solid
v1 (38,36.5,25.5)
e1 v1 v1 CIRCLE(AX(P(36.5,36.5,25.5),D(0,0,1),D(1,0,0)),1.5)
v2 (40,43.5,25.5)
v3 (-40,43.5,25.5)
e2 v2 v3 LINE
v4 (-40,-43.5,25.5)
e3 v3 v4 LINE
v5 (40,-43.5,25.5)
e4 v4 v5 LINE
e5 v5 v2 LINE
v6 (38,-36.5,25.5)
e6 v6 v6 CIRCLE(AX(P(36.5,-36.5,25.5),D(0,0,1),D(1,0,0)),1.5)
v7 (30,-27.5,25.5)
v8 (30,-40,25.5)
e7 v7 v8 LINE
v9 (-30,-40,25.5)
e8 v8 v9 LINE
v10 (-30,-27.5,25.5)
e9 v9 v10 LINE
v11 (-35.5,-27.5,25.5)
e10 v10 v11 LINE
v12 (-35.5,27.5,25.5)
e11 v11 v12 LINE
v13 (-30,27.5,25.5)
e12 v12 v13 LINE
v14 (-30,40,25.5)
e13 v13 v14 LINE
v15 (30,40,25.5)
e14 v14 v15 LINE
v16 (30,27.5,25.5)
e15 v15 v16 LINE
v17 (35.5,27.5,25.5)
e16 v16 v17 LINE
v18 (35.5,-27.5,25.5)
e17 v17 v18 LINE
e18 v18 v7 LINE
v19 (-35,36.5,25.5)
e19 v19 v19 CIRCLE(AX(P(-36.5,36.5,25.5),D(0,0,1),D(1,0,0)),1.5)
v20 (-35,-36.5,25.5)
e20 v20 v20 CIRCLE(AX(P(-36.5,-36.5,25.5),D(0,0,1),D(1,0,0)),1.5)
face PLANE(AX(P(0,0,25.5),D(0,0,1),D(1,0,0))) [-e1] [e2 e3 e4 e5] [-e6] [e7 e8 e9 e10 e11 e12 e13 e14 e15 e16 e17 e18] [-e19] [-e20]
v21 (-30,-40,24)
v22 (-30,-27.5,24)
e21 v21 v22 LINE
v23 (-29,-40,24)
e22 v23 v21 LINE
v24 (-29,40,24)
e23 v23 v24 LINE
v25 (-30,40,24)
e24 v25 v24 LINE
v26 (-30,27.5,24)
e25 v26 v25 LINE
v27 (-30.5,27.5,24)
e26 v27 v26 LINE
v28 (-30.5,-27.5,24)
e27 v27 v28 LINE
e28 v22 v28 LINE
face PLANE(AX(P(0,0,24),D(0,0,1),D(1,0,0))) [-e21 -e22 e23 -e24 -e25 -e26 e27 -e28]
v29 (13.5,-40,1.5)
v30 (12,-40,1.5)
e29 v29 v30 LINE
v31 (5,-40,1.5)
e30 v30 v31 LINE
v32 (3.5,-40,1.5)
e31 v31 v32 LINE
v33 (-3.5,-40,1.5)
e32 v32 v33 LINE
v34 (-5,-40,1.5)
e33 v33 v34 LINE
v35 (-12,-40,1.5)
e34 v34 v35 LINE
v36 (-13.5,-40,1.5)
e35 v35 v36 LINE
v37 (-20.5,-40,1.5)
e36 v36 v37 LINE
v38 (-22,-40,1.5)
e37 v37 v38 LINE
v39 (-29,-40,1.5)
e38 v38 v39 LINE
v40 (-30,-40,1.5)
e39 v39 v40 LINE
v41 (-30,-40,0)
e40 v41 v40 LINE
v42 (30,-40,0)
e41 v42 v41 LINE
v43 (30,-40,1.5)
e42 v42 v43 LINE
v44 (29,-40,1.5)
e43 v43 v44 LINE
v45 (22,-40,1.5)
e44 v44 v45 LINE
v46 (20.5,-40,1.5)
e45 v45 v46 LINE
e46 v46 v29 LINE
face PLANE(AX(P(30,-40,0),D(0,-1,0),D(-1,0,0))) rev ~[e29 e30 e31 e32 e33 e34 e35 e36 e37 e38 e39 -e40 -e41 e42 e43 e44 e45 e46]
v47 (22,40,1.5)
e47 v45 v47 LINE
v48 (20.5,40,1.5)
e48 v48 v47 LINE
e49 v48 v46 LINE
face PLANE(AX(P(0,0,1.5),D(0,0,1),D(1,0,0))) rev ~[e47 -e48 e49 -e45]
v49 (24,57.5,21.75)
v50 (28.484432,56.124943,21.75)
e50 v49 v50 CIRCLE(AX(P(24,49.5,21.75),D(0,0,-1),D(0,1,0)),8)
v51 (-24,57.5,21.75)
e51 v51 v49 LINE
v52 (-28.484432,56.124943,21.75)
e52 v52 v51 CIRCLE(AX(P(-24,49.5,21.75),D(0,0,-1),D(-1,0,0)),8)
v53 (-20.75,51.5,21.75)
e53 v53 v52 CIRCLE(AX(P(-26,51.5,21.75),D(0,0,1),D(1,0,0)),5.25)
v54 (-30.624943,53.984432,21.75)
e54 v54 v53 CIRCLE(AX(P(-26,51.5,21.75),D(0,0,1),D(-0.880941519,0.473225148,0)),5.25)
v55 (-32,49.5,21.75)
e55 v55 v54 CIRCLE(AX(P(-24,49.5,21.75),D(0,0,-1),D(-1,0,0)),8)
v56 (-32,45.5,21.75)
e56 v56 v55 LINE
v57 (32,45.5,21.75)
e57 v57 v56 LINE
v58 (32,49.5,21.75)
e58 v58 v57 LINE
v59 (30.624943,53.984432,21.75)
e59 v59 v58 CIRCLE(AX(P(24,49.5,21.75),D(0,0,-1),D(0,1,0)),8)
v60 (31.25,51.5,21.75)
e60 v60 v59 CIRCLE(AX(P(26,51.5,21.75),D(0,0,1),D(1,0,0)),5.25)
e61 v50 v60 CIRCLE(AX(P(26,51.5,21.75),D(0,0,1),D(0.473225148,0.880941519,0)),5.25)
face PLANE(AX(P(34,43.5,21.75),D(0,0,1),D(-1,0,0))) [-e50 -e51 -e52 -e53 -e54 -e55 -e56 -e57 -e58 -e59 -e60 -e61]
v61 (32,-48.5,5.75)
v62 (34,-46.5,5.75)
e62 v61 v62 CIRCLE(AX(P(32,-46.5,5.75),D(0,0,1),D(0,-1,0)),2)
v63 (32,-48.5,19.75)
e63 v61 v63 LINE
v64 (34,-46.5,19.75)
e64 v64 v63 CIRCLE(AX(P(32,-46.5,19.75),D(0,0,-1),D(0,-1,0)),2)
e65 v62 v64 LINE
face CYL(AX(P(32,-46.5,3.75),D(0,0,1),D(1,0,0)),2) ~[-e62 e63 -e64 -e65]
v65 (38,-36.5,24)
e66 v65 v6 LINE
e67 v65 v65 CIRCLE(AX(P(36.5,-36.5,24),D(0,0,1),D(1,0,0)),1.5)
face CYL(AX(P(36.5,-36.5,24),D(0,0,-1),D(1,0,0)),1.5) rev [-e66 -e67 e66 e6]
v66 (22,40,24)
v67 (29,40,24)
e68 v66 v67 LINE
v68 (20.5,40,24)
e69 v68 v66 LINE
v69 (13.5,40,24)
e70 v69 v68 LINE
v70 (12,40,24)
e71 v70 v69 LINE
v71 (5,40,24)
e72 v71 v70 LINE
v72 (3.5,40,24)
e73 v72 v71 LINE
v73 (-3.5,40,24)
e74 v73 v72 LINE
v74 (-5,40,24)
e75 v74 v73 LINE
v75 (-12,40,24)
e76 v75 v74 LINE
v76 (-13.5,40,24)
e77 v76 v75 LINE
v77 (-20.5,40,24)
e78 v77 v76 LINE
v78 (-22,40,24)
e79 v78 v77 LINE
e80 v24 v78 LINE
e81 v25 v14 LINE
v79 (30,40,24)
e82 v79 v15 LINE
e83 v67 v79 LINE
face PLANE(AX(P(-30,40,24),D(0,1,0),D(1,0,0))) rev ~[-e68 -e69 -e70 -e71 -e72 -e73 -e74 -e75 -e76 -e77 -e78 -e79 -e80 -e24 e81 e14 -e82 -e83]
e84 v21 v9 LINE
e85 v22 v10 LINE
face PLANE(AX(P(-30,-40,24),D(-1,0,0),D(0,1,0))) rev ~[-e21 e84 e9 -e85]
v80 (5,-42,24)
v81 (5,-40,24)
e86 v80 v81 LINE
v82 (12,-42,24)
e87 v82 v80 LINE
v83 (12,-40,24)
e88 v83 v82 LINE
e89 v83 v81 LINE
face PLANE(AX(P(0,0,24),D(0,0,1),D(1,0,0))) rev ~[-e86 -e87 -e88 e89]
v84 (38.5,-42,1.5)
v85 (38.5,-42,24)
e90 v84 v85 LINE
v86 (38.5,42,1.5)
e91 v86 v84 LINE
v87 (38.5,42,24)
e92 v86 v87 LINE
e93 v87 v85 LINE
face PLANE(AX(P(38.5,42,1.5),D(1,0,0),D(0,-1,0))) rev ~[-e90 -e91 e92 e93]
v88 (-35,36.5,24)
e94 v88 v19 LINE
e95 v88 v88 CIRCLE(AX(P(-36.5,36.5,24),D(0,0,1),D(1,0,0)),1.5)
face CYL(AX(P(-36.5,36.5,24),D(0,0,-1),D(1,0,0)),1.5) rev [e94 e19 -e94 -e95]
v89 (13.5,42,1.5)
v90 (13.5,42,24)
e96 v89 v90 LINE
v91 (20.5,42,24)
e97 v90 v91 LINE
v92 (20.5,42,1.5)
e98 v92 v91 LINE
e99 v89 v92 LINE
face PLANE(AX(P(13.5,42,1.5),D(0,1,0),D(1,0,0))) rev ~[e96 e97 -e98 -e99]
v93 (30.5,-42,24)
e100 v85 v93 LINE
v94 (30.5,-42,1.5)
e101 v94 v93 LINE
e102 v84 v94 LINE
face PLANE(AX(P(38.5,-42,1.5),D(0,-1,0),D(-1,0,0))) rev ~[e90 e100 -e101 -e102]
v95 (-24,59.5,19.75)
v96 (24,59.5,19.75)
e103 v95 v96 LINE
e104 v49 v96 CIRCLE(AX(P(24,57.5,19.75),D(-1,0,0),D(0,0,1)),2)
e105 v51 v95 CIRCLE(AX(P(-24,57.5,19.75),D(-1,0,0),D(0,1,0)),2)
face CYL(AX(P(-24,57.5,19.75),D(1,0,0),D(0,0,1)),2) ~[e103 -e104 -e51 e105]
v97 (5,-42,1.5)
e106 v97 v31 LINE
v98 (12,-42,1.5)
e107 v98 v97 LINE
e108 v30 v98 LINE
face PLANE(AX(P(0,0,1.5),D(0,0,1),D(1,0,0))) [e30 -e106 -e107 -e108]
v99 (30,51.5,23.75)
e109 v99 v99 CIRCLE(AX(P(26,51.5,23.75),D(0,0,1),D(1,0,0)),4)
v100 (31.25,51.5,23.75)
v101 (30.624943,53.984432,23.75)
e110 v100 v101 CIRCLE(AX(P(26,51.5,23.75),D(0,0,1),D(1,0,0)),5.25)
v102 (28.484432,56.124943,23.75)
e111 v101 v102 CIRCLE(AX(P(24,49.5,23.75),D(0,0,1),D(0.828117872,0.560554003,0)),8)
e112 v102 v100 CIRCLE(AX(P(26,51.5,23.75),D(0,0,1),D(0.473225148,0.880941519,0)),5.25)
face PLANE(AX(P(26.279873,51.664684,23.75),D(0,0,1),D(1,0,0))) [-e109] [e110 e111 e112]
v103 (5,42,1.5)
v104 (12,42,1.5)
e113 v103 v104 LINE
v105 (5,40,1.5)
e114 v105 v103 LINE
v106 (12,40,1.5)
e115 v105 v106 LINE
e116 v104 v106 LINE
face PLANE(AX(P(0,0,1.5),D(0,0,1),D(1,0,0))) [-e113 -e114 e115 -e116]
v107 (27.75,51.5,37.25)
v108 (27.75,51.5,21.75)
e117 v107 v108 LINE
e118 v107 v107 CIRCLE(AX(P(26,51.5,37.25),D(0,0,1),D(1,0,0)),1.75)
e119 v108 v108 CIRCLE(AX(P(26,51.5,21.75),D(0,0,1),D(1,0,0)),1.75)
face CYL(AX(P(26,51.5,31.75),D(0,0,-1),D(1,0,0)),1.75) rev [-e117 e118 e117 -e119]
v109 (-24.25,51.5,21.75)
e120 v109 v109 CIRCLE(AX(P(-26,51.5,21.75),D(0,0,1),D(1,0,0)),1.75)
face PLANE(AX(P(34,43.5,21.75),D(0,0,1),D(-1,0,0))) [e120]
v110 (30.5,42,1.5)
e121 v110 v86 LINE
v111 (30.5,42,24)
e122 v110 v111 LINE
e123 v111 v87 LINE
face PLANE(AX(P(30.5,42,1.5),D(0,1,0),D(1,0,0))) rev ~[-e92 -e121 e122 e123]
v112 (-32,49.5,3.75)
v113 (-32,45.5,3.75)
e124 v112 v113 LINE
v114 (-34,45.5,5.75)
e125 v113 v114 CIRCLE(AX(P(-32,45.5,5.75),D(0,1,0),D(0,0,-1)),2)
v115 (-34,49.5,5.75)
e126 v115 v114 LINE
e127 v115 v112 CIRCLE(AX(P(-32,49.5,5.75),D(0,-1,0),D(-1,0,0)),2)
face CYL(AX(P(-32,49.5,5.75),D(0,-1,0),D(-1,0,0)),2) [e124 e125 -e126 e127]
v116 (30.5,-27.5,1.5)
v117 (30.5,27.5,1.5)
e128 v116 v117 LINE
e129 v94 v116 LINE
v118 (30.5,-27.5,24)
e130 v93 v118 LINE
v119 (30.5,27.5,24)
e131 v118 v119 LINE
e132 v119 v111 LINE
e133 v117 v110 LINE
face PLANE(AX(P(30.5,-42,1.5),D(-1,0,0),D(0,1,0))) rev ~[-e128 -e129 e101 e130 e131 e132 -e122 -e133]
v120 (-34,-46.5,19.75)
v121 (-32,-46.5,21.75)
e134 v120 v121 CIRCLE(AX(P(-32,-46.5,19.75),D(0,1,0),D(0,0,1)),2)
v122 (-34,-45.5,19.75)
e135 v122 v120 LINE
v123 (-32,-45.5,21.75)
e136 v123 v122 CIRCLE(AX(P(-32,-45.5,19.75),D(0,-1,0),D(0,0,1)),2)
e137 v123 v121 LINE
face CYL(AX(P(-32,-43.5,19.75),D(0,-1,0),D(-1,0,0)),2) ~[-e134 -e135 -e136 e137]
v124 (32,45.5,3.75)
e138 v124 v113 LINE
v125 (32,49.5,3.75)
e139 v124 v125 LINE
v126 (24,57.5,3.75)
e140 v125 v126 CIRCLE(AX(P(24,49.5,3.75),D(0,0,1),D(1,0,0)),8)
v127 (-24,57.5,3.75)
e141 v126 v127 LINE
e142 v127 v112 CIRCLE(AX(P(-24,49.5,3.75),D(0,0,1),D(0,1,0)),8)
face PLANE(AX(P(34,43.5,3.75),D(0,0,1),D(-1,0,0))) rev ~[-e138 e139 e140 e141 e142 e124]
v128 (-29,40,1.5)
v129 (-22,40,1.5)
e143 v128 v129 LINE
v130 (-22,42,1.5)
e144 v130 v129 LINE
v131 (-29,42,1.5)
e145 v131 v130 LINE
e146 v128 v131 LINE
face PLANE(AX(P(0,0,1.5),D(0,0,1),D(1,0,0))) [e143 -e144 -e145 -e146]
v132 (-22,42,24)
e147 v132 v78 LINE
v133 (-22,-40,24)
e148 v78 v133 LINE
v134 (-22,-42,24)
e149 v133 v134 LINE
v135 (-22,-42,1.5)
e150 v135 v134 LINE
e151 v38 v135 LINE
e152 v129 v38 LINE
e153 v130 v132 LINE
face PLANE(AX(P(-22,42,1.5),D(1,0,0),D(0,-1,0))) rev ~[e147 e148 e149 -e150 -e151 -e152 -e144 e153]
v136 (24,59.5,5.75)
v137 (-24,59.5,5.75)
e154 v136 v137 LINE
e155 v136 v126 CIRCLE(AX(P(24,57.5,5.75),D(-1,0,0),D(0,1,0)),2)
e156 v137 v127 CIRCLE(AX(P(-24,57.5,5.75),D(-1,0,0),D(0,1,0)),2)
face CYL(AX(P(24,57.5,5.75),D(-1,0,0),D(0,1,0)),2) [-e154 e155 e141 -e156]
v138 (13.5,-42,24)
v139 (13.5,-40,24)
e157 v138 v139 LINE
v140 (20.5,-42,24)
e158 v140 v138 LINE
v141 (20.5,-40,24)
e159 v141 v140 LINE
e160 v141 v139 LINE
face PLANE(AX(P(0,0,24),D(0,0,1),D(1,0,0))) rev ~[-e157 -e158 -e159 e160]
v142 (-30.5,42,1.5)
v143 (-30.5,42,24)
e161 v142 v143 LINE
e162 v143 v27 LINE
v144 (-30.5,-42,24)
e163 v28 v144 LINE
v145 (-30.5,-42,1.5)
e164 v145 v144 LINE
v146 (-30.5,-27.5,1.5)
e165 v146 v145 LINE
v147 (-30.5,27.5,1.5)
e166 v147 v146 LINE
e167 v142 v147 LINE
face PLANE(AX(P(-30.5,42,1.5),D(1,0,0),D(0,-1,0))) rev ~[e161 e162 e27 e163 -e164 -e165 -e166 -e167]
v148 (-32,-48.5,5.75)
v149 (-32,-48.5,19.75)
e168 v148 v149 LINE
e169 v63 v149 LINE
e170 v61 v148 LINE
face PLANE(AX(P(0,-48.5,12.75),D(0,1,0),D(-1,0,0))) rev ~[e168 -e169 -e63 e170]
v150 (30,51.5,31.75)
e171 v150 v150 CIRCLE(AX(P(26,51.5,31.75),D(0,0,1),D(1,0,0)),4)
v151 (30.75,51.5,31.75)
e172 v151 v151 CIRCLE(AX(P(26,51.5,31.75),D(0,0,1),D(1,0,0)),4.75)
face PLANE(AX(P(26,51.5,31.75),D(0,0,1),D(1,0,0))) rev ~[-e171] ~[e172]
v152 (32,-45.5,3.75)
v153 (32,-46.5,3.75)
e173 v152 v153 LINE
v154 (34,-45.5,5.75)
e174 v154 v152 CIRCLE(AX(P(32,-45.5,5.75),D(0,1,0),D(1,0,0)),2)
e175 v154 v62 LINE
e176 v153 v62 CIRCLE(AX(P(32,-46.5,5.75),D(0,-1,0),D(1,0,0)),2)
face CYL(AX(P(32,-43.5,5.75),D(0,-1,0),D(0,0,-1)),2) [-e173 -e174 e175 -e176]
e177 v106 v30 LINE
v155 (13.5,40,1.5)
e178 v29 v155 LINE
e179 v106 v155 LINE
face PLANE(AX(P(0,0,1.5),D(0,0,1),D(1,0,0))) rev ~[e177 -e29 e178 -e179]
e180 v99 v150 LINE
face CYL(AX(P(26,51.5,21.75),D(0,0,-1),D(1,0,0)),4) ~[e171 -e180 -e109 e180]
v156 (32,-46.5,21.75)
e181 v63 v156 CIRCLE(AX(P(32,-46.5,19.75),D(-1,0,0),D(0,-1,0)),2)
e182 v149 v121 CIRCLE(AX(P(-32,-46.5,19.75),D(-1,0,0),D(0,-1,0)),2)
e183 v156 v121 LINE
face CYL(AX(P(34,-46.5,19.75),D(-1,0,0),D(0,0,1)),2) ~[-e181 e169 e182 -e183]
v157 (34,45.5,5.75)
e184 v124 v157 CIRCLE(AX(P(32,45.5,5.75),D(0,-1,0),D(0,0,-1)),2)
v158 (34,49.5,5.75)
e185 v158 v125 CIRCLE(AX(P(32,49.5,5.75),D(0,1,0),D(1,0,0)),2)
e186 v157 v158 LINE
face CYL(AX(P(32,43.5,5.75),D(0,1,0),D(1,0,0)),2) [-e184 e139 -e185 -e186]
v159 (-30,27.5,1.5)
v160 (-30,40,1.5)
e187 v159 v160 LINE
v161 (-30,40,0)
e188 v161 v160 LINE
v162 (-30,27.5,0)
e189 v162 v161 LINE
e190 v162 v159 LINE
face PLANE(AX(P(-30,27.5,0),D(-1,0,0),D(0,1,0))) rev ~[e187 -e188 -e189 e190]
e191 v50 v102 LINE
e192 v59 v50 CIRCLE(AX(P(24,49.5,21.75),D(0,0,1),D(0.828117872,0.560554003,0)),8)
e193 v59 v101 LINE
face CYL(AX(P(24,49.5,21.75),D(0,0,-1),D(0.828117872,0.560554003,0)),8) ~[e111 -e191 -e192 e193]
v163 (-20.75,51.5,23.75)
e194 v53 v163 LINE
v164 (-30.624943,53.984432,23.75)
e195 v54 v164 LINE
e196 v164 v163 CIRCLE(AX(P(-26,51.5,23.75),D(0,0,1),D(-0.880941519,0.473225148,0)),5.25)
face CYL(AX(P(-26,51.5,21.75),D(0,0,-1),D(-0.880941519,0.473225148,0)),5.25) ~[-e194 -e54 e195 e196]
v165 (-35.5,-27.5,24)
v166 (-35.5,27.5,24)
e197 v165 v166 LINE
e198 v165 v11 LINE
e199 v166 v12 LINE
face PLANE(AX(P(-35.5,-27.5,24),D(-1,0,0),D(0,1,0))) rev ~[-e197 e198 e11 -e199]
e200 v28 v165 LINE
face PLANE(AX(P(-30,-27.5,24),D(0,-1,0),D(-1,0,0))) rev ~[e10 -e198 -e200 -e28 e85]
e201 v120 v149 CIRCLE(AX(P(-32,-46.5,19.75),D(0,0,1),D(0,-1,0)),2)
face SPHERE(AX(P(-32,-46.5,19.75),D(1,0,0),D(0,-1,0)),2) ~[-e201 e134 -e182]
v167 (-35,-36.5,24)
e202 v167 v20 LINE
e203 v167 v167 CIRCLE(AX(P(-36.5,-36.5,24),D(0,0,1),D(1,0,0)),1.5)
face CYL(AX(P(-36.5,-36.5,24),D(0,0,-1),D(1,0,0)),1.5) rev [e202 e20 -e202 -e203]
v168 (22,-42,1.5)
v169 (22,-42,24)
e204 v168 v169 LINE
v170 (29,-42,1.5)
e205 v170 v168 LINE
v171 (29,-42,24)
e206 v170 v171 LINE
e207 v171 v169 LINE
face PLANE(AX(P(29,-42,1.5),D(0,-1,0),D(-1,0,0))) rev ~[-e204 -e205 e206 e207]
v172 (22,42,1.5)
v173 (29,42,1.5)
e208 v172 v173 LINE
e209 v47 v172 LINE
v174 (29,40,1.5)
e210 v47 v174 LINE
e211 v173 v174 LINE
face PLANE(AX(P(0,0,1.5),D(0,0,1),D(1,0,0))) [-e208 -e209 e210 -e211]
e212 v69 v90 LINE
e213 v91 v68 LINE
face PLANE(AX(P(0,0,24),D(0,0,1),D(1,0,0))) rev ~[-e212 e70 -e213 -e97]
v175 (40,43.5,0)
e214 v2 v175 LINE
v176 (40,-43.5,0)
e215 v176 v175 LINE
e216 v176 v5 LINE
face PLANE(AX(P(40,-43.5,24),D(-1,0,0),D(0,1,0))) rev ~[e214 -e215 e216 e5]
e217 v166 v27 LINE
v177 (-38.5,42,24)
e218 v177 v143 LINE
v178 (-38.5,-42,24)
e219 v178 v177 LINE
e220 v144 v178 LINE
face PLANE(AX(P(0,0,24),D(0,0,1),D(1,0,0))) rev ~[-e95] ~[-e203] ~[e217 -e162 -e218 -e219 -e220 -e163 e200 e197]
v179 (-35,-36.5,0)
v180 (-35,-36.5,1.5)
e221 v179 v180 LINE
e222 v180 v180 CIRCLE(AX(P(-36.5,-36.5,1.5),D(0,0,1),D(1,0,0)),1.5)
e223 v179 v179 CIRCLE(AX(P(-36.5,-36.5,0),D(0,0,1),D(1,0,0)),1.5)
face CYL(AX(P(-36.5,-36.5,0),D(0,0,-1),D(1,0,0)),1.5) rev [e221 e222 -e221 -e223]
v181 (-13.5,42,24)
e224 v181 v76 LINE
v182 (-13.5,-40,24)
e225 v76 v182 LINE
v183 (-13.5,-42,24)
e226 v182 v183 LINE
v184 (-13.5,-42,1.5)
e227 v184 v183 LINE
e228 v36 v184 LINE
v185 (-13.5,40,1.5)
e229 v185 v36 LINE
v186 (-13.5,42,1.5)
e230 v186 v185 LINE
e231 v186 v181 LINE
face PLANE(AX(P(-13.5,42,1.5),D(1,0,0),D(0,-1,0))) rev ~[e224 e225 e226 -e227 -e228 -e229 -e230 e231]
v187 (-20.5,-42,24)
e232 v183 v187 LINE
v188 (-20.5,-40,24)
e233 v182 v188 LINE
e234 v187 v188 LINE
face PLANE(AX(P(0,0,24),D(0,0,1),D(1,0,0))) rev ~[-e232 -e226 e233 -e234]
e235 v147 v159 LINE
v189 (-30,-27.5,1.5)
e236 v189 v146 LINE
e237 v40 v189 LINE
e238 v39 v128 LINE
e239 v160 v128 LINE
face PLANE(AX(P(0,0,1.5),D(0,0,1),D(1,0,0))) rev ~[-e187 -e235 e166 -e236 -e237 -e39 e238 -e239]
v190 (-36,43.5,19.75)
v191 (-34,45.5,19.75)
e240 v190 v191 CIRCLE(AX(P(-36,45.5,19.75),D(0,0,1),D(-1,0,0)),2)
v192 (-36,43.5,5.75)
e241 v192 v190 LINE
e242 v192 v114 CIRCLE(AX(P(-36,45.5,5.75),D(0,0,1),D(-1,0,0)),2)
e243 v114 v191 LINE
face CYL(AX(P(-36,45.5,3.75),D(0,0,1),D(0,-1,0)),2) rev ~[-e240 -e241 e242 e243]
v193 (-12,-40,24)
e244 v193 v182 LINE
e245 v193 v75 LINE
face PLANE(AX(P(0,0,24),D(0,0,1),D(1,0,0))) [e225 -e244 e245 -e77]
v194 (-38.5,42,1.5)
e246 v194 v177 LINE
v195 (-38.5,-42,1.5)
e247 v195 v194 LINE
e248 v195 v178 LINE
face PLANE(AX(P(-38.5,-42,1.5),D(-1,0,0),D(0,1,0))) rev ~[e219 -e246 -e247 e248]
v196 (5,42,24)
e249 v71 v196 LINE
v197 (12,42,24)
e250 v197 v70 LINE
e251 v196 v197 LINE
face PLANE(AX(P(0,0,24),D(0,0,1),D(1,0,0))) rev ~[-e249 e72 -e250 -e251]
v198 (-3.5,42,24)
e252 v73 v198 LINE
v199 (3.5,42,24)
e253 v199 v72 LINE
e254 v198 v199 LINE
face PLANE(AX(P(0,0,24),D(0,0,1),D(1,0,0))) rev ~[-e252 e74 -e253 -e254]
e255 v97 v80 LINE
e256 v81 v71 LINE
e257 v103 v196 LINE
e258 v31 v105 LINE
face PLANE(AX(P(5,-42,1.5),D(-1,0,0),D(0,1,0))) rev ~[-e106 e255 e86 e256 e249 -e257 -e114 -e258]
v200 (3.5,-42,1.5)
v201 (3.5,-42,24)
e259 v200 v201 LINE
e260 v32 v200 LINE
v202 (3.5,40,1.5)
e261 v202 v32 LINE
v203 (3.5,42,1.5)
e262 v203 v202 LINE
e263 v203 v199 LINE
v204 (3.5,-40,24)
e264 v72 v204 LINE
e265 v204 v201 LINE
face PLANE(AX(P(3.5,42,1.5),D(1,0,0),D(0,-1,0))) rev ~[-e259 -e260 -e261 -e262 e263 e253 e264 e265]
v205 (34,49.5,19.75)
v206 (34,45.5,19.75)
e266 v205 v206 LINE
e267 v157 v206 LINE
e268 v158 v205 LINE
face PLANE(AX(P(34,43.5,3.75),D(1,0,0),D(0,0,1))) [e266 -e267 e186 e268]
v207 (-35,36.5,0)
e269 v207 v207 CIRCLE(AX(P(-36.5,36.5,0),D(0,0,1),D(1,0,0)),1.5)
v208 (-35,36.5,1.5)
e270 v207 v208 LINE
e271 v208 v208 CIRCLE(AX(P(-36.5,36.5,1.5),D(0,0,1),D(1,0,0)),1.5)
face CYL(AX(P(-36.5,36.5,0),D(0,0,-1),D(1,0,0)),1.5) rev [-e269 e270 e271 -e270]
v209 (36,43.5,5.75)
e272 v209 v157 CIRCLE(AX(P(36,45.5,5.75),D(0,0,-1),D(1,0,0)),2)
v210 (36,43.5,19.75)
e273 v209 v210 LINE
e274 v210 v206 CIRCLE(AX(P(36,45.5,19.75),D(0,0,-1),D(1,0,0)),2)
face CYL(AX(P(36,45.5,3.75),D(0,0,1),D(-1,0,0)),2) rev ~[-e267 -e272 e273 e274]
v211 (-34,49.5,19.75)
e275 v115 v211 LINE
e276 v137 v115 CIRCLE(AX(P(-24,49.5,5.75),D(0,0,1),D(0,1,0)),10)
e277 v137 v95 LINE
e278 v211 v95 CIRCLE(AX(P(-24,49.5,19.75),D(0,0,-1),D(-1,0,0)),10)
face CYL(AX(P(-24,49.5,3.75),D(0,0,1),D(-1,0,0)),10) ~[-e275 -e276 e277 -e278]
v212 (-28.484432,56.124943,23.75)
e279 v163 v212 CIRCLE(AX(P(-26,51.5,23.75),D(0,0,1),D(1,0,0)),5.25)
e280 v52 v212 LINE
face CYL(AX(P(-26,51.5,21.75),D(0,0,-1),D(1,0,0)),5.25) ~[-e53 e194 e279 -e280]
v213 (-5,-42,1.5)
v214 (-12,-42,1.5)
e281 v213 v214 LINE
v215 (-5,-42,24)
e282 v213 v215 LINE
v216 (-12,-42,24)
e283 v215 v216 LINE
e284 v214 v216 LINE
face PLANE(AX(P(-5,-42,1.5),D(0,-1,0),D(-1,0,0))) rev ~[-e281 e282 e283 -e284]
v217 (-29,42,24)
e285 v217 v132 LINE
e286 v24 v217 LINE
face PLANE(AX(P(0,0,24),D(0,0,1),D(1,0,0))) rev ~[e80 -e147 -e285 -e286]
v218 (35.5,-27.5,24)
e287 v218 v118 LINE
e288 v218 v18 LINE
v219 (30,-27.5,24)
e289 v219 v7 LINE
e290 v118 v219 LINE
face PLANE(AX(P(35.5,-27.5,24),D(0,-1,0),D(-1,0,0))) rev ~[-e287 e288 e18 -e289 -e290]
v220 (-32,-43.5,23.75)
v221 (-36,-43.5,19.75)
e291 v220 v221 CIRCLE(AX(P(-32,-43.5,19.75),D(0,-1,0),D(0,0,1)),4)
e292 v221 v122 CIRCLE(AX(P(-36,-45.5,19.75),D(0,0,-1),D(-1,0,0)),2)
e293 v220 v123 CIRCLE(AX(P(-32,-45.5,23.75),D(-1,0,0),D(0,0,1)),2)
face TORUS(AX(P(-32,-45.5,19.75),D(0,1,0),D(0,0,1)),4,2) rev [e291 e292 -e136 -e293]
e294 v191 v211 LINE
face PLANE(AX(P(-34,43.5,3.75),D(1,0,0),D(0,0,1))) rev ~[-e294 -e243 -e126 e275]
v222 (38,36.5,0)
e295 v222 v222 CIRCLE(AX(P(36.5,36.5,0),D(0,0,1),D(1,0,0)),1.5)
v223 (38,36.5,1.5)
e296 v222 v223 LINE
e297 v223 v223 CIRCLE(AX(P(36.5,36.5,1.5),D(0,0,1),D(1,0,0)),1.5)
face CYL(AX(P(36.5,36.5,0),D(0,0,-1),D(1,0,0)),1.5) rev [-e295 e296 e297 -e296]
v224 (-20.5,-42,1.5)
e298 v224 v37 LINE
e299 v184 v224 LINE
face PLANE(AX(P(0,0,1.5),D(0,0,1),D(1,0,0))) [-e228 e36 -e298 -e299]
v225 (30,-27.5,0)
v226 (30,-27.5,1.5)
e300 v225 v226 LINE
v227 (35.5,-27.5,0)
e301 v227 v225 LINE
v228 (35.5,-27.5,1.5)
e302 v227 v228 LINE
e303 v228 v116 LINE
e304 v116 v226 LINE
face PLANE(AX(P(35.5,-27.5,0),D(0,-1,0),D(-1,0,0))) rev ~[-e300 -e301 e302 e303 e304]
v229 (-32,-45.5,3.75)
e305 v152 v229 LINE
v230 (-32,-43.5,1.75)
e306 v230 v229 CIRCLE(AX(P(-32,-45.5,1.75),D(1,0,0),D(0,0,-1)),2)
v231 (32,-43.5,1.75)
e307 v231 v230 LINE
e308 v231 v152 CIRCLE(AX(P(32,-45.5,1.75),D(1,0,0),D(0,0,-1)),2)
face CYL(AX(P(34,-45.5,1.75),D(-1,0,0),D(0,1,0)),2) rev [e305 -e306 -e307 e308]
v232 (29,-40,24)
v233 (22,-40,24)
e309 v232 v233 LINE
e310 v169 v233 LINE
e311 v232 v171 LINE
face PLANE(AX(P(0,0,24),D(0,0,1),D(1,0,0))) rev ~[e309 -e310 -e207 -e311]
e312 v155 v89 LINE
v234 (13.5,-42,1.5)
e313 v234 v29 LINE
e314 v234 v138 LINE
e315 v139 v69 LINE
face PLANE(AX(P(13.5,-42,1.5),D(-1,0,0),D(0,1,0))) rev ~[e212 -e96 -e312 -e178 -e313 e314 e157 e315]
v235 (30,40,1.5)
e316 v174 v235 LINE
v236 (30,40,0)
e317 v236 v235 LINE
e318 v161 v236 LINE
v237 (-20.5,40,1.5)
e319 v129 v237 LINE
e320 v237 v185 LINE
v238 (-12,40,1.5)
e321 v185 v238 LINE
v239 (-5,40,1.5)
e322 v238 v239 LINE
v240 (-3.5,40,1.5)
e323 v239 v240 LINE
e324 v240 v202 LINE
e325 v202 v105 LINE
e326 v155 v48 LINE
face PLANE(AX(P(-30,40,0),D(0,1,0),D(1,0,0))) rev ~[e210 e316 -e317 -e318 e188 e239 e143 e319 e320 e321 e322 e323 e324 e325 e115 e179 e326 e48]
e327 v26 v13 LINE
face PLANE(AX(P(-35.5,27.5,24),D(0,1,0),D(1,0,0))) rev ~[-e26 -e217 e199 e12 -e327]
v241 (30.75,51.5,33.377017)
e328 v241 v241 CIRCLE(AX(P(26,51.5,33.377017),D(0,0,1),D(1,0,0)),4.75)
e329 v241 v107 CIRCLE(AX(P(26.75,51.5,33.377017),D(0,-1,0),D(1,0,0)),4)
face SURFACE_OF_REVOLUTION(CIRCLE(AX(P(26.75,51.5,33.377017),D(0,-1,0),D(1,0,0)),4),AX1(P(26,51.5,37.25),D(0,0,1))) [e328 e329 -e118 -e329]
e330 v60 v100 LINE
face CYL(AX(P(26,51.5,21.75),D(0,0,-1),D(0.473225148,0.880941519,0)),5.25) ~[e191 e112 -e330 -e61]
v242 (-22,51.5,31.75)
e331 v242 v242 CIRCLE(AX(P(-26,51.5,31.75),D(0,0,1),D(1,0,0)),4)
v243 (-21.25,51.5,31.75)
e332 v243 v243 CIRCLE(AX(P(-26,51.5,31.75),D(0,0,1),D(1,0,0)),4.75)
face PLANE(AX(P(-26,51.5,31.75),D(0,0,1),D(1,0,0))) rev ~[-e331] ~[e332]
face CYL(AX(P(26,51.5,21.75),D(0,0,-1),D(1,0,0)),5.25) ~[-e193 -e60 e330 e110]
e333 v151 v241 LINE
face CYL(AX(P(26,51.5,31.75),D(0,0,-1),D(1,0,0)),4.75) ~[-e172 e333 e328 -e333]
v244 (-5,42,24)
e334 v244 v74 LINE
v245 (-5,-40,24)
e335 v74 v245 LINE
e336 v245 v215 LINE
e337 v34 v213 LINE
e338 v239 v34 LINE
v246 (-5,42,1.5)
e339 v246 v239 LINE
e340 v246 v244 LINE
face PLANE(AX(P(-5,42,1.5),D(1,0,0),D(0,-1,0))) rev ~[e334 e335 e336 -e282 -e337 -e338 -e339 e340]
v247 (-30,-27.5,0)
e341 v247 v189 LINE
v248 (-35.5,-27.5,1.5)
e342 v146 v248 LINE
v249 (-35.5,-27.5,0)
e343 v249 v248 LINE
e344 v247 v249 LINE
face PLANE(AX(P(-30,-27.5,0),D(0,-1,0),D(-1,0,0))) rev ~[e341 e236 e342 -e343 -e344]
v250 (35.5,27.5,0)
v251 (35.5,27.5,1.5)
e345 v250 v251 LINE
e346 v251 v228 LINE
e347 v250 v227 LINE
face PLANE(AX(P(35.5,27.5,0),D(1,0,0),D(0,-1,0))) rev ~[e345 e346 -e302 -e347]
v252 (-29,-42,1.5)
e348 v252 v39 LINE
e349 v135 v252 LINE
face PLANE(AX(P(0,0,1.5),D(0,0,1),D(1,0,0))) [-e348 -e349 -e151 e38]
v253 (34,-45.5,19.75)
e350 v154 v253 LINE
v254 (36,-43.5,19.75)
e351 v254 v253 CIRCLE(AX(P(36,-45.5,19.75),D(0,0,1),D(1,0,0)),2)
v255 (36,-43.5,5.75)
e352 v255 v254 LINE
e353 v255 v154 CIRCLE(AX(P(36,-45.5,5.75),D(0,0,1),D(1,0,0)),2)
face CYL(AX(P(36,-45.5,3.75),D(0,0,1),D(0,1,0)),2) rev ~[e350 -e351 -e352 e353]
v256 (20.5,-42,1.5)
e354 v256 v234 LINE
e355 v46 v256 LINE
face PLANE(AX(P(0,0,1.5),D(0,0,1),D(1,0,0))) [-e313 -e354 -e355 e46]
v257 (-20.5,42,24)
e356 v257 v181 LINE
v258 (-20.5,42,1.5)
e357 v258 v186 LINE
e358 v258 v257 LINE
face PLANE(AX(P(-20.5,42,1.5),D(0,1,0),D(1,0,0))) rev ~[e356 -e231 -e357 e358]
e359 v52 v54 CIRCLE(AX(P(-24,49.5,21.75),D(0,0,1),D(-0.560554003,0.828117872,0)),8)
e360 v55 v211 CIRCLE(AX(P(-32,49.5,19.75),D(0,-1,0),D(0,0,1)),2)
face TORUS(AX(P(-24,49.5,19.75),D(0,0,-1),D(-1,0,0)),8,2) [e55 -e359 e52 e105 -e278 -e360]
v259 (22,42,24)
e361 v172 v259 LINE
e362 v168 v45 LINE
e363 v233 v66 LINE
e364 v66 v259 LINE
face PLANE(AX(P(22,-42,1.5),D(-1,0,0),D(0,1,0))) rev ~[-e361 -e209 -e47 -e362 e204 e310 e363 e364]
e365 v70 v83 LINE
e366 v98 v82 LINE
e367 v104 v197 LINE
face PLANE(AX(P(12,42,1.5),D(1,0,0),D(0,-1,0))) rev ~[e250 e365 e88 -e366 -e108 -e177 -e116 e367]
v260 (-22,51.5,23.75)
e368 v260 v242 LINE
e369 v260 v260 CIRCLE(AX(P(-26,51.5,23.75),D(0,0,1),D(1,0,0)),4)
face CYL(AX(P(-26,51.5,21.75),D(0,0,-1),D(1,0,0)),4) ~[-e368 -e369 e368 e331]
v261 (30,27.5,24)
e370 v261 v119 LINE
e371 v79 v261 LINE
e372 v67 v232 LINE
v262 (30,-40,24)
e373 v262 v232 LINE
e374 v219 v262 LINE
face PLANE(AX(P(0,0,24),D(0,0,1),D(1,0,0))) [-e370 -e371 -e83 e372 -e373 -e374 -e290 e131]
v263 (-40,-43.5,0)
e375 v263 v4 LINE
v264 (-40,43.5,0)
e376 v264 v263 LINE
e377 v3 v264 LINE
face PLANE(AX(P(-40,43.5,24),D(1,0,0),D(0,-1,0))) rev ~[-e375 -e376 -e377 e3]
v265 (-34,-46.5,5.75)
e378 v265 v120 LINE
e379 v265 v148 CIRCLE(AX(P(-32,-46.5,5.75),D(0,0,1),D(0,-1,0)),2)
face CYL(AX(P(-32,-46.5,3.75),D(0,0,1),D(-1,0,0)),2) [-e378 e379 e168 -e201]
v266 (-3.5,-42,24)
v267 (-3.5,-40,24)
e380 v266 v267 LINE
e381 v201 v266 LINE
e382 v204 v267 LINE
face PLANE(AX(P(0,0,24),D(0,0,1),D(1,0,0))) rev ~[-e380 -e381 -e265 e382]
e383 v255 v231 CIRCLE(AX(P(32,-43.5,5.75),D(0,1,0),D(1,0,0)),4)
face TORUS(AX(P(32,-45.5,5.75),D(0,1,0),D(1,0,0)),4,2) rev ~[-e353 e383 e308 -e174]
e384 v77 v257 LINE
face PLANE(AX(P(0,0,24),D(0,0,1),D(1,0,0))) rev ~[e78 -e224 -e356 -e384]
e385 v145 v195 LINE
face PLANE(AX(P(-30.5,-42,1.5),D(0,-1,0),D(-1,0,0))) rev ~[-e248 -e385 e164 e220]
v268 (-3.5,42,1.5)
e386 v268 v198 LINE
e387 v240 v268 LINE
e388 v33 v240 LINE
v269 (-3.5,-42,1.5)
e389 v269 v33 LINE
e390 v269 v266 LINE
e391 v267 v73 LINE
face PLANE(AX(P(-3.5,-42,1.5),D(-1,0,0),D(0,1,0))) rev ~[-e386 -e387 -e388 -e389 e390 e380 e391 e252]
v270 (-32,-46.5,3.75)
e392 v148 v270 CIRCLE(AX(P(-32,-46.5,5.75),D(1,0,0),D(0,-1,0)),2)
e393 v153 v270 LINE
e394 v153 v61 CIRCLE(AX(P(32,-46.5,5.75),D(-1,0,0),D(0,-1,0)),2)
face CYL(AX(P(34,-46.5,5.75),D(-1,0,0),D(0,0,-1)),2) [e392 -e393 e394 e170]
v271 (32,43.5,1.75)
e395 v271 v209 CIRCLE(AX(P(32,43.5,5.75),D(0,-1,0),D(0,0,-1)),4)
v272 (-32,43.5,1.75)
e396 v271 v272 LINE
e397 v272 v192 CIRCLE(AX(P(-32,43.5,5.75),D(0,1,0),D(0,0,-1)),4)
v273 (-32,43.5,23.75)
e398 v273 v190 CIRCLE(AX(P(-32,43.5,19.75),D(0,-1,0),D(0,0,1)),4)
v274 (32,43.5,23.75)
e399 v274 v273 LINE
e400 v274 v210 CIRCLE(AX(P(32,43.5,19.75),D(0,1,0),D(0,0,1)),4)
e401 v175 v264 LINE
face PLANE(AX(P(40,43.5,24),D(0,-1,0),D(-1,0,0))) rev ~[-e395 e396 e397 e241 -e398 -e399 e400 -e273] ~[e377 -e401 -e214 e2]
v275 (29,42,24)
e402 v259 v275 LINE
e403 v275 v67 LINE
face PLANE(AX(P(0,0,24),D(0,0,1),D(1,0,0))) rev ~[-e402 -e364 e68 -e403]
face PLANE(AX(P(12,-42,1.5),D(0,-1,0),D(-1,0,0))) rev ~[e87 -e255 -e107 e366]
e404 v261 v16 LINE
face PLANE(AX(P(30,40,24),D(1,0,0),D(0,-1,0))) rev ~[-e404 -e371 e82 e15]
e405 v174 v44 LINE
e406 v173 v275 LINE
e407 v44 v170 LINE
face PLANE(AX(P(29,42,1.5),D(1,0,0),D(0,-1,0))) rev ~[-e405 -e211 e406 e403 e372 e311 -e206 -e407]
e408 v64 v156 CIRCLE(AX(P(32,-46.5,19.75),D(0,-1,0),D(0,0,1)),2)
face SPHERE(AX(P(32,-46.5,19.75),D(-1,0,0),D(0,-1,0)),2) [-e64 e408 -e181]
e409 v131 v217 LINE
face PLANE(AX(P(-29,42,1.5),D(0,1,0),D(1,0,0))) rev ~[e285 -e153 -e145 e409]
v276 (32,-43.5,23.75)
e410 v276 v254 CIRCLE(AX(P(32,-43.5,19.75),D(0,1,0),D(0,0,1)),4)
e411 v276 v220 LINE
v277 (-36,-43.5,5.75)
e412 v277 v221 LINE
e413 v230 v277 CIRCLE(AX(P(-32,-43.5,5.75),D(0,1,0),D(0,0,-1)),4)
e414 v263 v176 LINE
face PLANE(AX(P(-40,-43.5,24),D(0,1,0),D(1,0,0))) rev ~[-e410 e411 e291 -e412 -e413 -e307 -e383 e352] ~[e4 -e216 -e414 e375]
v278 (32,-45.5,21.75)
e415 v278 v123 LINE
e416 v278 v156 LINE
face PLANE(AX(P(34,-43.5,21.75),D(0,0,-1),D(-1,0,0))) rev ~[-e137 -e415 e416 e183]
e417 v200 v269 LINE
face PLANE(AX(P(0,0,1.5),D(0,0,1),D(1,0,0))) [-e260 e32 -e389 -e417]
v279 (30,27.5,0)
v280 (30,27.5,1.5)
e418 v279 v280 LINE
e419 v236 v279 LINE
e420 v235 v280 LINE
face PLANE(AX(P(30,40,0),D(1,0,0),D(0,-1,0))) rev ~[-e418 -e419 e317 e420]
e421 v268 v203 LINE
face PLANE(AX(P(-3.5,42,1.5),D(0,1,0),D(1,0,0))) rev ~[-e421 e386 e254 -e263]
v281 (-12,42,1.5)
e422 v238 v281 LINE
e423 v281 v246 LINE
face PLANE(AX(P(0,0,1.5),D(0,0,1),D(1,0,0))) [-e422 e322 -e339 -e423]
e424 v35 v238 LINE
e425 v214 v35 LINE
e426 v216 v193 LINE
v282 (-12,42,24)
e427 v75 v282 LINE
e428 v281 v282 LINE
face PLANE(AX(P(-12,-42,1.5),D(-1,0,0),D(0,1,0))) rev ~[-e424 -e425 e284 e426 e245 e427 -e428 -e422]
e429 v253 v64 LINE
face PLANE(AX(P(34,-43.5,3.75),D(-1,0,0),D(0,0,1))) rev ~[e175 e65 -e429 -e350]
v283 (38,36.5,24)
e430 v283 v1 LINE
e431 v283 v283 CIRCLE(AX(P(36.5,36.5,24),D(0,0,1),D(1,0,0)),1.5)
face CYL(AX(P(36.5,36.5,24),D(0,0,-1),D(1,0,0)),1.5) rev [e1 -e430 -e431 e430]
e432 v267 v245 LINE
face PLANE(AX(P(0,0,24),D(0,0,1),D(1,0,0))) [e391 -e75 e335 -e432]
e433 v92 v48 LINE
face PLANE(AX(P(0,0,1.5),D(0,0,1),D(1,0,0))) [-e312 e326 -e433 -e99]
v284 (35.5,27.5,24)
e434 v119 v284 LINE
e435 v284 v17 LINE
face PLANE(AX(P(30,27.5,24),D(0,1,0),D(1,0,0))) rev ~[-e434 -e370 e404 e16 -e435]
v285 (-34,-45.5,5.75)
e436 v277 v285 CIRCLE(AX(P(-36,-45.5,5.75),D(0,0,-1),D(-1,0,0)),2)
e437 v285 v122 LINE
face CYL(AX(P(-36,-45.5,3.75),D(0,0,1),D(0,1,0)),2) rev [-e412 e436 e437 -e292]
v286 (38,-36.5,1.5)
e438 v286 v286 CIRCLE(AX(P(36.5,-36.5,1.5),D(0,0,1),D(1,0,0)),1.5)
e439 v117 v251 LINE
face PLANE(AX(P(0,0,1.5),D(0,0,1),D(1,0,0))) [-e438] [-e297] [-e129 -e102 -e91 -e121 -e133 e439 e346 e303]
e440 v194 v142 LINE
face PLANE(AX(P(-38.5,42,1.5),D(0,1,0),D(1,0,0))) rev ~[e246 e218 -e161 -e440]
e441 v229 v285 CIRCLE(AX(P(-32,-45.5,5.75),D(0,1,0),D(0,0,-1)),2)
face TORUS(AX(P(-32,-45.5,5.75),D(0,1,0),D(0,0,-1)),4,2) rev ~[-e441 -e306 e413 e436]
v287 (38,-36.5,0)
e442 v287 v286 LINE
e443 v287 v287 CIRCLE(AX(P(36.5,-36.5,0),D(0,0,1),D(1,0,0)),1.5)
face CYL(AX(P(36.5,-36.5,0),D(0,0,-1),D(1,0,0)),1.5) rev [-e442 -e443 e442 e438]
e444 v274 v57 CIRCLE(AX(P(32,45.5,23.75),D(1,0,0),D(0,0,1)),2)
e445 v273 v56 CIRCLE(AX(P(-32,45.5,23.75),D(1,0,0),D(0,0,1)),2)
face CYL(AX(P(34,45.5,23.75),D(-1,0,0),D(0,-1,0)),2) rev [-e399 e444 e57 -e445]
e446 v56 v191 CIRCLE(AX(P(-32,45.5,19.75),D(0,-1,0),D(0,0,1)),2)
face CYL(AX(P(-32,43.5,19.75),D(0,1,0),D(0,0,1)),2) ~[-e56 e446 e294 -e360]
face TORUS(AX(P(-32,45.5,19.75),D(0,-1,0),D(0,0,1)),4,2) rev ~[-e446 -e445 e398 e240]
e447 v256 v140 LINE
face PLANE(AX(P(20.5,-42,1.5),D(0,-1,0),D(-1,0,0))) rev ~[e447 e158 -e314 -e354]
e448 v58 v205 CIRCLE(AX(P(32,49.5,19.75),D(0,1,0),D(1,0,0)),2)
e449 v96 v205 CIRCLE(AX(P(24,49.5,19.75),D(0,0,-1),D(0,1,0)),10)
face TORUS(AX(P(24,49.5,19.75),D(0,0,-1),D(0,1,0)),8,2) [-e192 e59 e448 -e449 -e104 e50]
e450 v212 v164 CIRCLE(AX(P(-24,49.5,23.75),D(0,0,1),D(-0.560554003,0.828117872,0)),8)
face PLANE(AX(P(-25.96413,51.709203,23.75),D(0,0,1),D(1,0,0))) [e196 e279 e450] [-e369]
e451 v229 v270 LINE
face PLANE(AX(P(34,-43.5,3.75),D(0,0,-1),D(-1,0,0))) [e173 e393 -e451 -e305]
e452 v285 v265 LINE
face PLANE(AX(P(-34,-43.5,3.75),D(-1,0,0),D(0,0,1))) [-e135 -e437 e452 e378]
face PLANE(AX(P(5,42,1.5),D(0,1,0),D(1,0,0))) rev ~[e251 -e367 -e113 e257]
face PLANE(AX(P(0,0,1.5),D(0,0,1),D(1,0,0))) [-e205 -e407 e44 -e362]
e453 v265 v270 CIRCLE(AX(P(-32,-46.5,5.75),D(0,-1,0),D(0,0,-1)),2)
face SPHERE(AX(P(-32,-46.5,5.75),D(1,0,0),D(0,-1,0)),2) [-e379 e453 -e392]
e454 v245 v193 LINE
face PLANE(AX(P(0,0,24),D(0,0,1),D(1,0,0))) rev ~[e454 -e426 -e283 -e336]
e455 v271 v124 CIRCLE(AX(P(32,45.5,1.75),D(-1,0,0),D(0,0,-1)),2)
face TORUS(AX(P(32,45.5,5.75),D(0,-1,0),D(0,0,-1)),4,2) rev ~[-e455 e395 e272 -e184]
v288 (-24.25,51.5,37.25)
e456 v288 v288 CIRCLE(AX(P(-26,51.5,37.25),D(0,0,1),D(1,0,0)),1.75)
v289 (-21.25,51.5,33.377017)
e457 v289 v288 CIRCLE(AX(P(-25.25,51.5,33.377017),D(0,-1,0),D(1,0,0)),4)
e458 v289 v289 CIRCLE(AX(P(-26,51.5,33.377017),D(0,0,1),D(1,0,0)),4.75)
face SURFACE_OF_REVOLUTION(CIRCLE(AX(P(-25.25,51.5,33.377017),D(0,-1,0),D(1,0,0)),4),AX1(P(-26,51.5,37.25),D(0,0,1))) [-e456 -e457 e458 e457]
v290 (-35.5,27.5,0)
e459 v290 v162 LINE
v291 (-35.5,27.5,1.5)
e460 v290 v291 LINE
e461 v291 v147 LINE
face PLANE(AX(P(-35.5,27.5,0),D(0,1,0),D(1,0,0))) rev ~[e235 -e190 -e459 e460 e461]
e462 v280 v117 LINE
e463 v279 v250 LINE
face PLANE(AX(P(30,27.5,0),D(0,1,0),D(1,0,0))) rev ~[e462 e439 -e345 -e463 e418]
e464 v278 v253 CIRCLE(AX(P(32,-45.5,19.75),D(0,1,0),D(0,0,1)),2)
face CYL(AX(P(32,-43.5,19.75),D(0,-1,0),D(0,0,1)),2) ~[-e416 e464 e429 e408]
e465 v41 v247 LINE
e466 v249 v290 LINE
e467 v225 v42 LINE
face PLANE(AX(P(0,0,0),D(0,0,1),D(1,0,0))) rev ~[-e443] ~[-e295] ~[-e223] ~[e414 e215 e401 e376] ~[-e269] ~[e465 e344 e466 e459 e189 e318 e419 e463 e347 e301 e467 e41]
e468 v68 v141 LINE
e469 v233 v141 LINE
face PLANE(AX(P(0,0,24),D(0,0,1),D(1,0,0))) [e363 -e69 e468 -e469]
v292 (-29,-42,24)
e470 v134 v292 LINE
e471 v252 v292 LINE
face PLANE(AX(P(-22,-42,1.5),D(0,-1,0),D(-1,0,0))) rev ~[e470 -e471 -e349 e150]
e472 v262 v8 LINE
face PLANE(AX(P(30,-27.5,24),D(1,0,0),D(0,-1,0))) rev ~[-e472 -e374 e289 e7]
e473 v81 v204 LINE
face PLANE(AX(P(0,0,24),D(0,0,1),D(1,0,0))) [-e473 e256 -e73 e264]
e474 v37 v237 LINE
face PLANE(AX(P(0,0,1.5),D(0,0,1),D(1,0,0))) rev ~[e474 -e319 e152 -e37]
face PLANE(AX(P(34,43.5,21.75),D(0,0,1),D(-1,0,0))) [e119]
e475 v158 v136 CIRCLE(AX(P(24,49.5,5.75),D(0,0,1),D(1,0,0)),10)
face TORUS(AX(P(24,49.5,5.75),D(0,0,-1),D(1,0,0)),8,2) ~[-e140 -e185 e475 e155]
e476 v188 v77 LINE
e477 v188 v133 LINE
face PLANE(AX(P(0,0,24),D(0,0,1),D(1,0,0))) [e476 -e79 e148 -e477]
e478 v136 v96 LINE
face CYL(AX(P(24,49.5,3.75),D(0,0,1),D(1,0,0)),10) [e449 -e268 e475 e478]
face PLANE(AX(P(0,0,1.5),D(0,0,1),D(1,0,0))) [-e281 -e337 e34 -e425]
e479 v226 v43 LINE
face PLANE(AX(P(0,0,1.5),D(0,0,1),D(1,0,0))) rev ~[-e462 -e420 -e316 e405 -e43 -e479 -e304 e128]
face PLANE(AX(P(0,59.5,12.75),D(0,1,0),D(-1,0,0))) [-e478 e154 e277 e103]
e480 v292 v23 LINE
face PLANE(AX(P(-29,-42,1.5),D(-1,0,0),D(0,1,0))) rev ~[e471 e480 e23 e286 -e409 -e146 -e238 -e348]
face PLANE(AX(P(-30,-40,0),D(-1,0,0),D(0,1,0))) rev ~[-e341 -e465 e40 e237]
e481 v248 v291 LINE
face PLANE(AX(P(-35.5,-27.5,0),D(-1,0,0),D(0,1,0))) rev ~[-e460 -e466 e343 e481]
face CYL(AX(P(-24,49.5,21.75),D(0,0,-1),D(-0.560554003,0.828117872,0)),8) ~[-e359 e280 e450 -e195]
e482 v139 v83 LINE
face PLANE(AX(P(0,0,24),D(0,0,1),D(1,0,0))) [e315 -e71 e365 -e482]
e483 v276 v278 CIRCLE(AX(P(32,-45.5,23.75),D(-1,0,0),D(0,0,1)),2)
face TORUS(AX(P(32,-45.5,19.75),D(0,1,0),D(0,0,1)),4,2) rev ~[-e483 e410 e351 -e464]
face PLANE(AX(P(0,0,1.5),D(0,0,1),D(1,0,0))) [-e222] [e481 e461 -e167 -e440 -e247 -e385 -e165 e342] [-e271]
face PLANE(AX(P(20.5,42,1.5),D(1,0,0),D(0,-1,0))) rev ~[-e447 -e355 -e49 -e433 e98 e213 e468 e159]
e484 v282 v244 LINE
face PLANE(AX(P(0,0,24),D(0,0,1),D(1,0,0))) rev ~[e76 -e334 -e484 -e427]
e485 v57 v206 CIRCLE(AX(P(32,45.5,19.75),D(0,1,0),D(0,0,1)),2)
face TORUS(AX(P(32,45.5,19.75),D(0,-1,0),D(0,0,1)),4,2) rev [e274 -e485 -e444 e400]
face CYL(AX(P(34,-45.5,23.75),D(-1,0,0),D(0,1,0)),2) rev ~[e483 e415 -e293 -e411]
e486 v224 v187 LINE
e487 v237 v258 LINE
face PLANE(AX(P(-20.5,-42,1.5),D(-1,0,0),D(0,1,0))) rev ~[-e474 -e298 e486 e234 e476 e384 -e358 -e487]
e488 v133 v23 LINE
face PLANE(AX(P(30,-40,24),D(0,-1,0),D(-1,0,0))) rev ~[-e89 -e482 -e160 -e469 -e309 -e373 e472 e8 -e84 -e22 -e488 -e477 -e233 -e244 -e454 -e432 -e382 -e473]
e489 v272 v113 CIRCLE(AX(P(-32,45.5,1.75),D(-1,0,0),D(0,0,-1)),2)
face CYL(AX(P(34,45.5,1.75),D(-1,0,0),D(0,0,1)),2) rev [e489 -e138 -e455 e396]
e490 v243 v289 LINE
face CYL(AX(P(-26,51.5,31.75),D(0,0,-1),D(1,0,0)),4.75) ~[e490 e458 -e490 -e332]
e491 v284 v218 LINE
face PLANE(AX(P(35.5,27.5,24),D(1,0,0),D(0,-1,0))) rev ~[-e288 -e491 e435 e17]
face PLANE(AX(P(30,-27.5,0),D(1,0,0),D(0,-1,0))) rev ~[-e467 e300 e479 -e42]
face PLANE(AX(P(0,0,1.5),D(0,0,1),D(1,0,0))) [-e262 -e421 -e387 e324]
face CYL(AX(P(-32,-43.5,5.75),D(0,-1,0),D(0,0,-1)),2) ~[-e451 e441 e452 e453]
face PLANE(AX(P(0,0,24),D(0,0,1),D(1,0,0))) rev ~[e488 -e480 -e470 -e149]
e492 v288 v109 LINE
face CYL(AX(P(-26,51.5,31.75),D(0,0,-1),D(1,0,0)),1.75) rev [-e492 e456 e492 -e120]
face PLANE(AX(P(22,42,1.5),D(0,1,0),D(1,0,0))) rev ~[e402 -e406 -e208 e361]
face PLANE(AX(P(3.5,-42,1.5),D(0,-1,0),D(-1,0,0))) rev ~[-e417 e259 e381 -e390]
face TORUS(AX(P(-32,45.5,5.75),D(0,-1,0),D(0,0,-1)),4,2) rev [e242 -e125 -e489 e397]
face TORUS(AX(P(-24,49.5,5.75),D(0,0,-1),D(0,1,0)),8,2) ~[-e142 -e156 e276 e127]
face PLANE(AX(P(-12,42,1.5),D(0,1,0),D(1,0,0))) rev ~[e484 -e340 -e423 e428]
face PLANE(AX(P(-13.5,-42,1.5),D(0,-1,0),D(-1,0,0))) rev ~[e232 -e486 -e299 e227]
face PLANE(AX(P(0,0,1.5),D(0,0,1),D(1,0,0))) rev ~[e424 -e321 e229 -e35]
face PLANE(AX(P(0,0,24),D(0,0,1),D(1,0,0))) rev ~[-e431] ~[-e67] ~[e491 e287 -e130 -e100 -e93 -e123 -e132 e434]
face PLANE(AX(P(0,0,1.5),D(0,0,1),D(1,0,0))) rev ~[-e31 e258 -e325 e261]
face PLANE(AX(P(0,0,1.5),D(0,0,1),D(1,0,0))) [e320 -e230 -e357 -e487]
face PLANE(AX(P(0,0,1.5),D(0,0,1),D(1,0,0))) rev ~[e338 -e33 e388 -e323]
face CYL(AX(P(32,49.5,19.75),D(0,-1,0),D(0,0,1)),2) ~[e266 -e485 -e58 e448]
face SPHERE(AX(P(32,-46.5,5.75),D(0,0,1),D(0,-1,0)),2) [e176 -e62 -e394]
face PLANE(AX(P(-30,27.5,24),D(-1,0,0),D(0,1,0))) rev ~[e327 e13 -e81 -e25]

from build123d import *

# Parameters (mm, degrees)
F0_R      = 1.5
F1_DEPTH  = 1.5
F2_W      = 80
F2_H      = 87
F2_W_2    = 1.5
F2_H_2    = 80
F2_H_3    = 2
F3_DEPTH  = 22.5
F4_START  = 24
F4_DEPTH  = 1.5
F6_START  = -87
F5_W      = 68
F5_H      = 18
F6_DEPTH  = 5
F7_DEPTH  = 16
F8_R      = 10
F9_R      = 2
F10_R     = 4.75
F10_R_2   = 4
F11_DEPTH = 2
F10_R_3   = 1.75
F12_DEPTH = 10
F13_START = 10
F13_DEPTH = 5.5


# Not quite as in the source:
# - a fillet or chamfer that OpenCascade refuses, or shapes differently, is made with other operations: its cross-section is extruded or revolved along the edge and cut away or added


with BuildPart() as f1:
    # F0 (on Top) → F1 (new body)
    with BuildSketch(Plane.XY):
        Polygon((30, 43.5), (-40, 43.5), (-40, -43.5), (40, -43.5), (40, 27.5), (40, 43.5), align=None)
        with Locations((-36.5, -36.5)):
            Circle(F0_R, mode=Mode.SUBTRACT)
        with Locations((36.5, -36.5)):
            Circle(F0_R, mode=Mode.SUBTRACT)
        with Locations((-36.5, 36.5)):
            Circle(F0_R, mode=Mode.SUBTRACT)
        Polygon((30, 27.5), (35.5, 27.5), (35.5, -27.5), (30, -27.5), (30, -40), (-30, -40), (-30, -27.5), (-35.5, -27.5), (-35.5, 27.5), (-30, 27.5), (-30, 40), (30, 40), align=None, mode=Mode.SUBTRACT)
        with Locations((36.5, 36.5)):
            Circle(F0_R, mode=Mode.SUBTRACT)
    extrude(amount=F1_DEPTH)

    # F2 (on face) → F3 (join)
    with BuildSketch(Plane.XY.offset(1.5)):
        Rectangle(F2_W, F2_H)
        Polygon((-38.5, -42), (-38.5, 42), (-30.5, 42), (-29, 42), (-22, 42), (-20.5, 42), (-13.5, 42), (-12, 42), (-5, 42), (-3.5, 42), (3.5, 42), (5, 42), (12, 42), (13.5, 42), (20.5, 42), (22, 42), (29, 42), (30.5, 42), (38.5, 42), (38.5, -42), (30.5, -42), (29, -42), (22, -42), (20.5, -42), (13.5, -42), (12, -42), (5, -42), (3.5, -42), (-3.5, -42), (-5, -42), (-12, -42), (-13.5, -42), (-20.5, -42), (-22, -42), (-29, -42), (-30.5, -42), align=None, mode=Mode.SUBTRACT)
        Polygon((-30, 27.5), (-30.5, 27.5), (-30.5, -27.5), (-30, -27.5), (-30, -40), (-29, -40), (-29, 40), (-30, 40), align=None)
        Polygon((-29, 42), (-30.5, 42), (-30.5, 27.5), (-30, 27.5), (-30, 40), (-29, 40), align=None)
        with Locations((-21.25, 0)):
            Rectangle(F2_W_2, F2_H_2)
        with Locations((-12.75, 0)):
            Rectangle(F2_W_2, F2_H_2)
        with Locations((-4.25, 0)):
            Rectangle(F2_W_2, F2_H_2)
        with Locations((4.25, 0)):
            Rectangle(F2_W_2, F2_H_2)
        with Locations((12.75, 0)):
            Rectangle(F2_W_2, F2_H_2)
        with Locations((21.25, 0)):
            Rectangle(F2_W_2, F2_H_2)
        Polygon((30, 40), (29, 40), (29, -40), (30, -40), (30, -27.5), (30.5, -27.5), (30.5, 27.5), (30, 27.5), align=None)
        Polygon((29, -40), (29, -42), (30.5, -42), (30.5, -27.5), (30, -27.5), (30, -40), align=None)
        Polygon((30.5, 42), (29, 42), (29, 40), (30, 40), (30, 27.5), (30.5, 27.5), align=None)
        Polygon((-30.5, -27.5), (-30.5, -42), (-29, -42), (-29, -40), (-30, -40), (-30, -27.5), align=None)
        with Locations((21.25, -41)):
            Rectangle(F2_W_2, F2_H_3)
        with Locations((12.75, -41)):
            Rectangle(F2_W_2, F2_H_3)
        with Locations((-4.25, -41)):
            Rectangle(F2_W_2, F2_H_3)
        with Locations((4.25, -41)):
            Rectangle(F2_W_2, F2_H_3)
        with Locations((-12.75, -41)):
            Rectangle(F2_W_2, F2_H_3)
        with Locations((-21.25, -41)):
            Rectangle(F2_W_2, F2_H_3)
        with Locations((21.25, 41)):
            Rectangle(F2_W_2, F2_H_3)
        with Locations((12.75, 41)):
            Rectangle(F2_W_2, F2_H_3)
        with Locations((4.25, 41)):
            Rectangle(F2_W_2, F2_H_3)
        with Locations((-4.25, 41)):
            Rectangle(F2_W_2, F2_H_3)
        with Locations((-12.75, 41)):
            Rectangle(F2_W_2, F2_H_3)
        with Locations((-21.25, 41)):
            Rectangle(F2_W_2, F2_H_3)
    extrude(amount=F3_DEPTH)

    # F0 (on Top) → F4 (join)
    with BuildSketch(Plane.XY.offset(F4_START)):
        Polygon((30, 43.5), (-40, 43.5), (-40, -43.5), (40, -43.5), (40, 27.5), (40, 43.5), align=None)
        with Locations((-36.5, -36.5)):
            Circle(F0_R, mode=Mode.SUBTRACT)
        with Locations((36.5, -36.5)):
            Circle(F0_R, mode=Mode.SUBTRACT)
        with Locations((-36.5, 36.5)):
            Circle(F0_R, mode=Mode.SUBTRACT)
        Polygon((30, 27.5), (35.5, 27.5), (35.5, -27.5), (30, -27.5), (30, -40), (-30, -40), (-30, -27.5), (-35.5, -27.5), (-35.5, 27.5), (-30, 27.5), (-30, 40), (30, 40), align=None, mode=Mode.SUBTRACT)
        with Locations((36.5, 36.5)):
            Circle(F0_R, mode=Mode.SUBTRACT)
    extrude(amount=F4_DEPTH)

    # F5 (on face) → F6 (join)
    with BuildSketch(Plane(origin=(0, 43.5, 0), x_dir=(-1, 0, 0), z_dir=(0, 1, 0)).offset(F6_START)):
        with Locations((0, 12.75)):
            Rectangle(F5_W, F5_H)
    extrude(amount=-F6_DEPTH)

    # F5 (on face) → F7 (join)
    with BuildSketch(Plane(origin=(0, 43.5, 0), x_dir=(-1, 0, 0), z_dir=(0, 1, 0))):
        with Locations((0, 12.75)):
            Rectangle(F5_W, F5_H)
    extrude(amount=F7_DEPTH)

    # F8
    f8_edges = [f1.edges().sort_by_distance(p)[0] for p in [
        (34, 59.5, 12.75),
        (-34, 59.5, 12.75),
    ]]
    fillet(f8_edges, radius=F8_R)

    # F9
    f9_edges = [f1.edges().sort_by_distance(p)[0] for p in [
        (34, 46.5, 3.75),
        (31.071068, 56.571068, 3.75),
        (0, 43.5, 3.75),
        (0, 59.5, 3.75),
        (-34, 46.5, 3.75),
        (-31.071068, 56.571068, 3.75),
        (-34, 46.5, 21.75),
        (-31.071068, 56.571068, 21.75),
        (0, 43.5, 21.75),
        (0, 59.5, 21.75),
        (34, 46.5, 21.75),
        (31.071068, 56.571068, 21.75),
        (0, -48.5, 21.75),
        (34, -48.5, 12.75),
        (0, -48.5, 3.75),
        (-34, -48.5, 12.75),
        (0, -43.5, 21.75),
        (34, -43.5, 12.75),
        (0, -43.5, 3.75),
        (-34, -43.5, 12.75),
        (-34, -46, 21.75),
        (-34, -46, 3.75),
        (34, -46, 3.75),
        (34, -46, 21.75),
        (-34, 43.5, 12.75),
        (34, 43.5, 12.75),
    ]]
    fillet(f9_edges, radius=F9_R)

    # F10 (on face) → F11 (join)
    with BuildSketch(Plane.XY.offset(21.75)):
        with BuildLine():
            ThreePointArc((-30.6249429729, 53.9844320271), (-27.2809272798, 46.4086617374), (-20.75, 51.5))
            ThreePointArc((-20.75, 51.5), (-23.3056325549, 56.0058721765), (-28.4844320271, 56.1249429729))
            ThreePointArc((-28.4844320271, 56.1249429729), (-29.6568542495, 55.1568542495), (-30.6249429729, 53.9844320271))
        make_face()
        with Locations((-26, 51.5)):
            Circle(F10_R, mode=Mode.SUBTRACT)
        with Locations((-26, 51.5)):
            Circle(F10_R)
        with Locations((-26, 51.5)):
            Circle(F10_R_2, mode=Mode.SUBTRACT)
        with BuildLine():
            ThreePointArc((30.6249429729, 53.9844320271), (29.6568542495, 55.1568542495), (28.4844320271, 56.1249429729))
            ThreePointArc((28.4844320271, 56.1249429729), (21.4941278235, 48.8056325549), (31.25, 51.5))
            ThreePointArc((31.25, 51.5), (31.0913382626, 52.7809272798), (30.6249429729, 53.9844320271))
        make_face()
        with Locations((26, 51.5)):
            Circle(F10_R, mode=Mode.SUBTRACT)
        with Locations((26, 51.5)):
            Circle(F10_R)
        with Locations((26, 51.5)):
            Circle(F10_R_2, mode=Mode.SUBTRACT)
    extrude(amount=F11_DEPTH)

    # F10 (on face) → F12 (join)
    with BuildSketch(Plane.XY.offset(21.75)):
        with Locations((-26, 51.5)):
            Circle(F10_R_2)
        with Locations((-26, 51.5)):
            Circle(F10_R_3, mode=Mode.SUBTRACT)
        with Locations((26, 51.5)):
            Circle(F10_R_2)
        with Locations((26, 51.5)):
            Circle(F10_R_3, mode=Mode.SUBTRACT)
    extrude(amount=F12_DEPTH)

    # F10 (on face) → F13 (join)
    with BuildSketch(Plane.XY.offset(21.75).offset(F13_START)):
        with Locations((-26, 51.5)):
            Circle(F10_R)
        with Locations((-26, 51.5)):
            Circle(F10_R_2, mode=Mode.SUBTRACT)
        with Locations((26, 51.5)):
            Circle(F10_R)
        with Locations((26, 51.5)):
            Circle(F10_R_2, mode=Mode.SUBTRACT)
        with Locations((-26, 51.5)):
            Circle(F10_R_2)
        with Locations((-26, 51.5)):
            Circle(F10_R_3, mode=Mode.SUBTRACT)
        with Locations((26, 51.5)):
            Circle(F10_R_2)
        with Locations((26, 51.5)):
            Circle(F10_R_3, mode=Mode.SUBTRACT)
    extrude(amount=F13_DEPTH)

    # F14: fillet of radius 4 on 2 edges, made by hand

    # F14_s1 → F14_t2 (revolve, cut)
    with BuildSketch(Plane.XZ.offset(-51.5)):
        with BuildLine():
            ThreePointArc((-21.25, 33.3770166538), (-22.0877223398, 35.8265063966), (-24.25, 37.25))
            Line((-24.25, 37.25), (-21.25, 37.25))
            Line((-21.25, 37.25), (-21.25, 33.3770166538))
        make_face()
    revolve(axis=Axis((-26, 51.5, 37.25), (0, 0, 1)), mode=Mode.SUBTRACT)

    # F14_s3 → F14_t4 (revolve, cut)
    with BuildSketch(Plane.XZ.offset(-51.5)):
        with BuildLine():
            ThreePointArc((30.75, 33.3770166538), (29.9122776602, 35.8265063966), (27.75, 37.25))
            Line((27.75, 37.25), (30.75, 37.25))
            Line((30.75, 37.25), (30.75, 33.3770166538))
        make_face()
    revolve(axis=Axis((26, 51.5, 37.25), (0, 0, 1)), mode=Mode.SUBTRACT)


solid = f1.part
